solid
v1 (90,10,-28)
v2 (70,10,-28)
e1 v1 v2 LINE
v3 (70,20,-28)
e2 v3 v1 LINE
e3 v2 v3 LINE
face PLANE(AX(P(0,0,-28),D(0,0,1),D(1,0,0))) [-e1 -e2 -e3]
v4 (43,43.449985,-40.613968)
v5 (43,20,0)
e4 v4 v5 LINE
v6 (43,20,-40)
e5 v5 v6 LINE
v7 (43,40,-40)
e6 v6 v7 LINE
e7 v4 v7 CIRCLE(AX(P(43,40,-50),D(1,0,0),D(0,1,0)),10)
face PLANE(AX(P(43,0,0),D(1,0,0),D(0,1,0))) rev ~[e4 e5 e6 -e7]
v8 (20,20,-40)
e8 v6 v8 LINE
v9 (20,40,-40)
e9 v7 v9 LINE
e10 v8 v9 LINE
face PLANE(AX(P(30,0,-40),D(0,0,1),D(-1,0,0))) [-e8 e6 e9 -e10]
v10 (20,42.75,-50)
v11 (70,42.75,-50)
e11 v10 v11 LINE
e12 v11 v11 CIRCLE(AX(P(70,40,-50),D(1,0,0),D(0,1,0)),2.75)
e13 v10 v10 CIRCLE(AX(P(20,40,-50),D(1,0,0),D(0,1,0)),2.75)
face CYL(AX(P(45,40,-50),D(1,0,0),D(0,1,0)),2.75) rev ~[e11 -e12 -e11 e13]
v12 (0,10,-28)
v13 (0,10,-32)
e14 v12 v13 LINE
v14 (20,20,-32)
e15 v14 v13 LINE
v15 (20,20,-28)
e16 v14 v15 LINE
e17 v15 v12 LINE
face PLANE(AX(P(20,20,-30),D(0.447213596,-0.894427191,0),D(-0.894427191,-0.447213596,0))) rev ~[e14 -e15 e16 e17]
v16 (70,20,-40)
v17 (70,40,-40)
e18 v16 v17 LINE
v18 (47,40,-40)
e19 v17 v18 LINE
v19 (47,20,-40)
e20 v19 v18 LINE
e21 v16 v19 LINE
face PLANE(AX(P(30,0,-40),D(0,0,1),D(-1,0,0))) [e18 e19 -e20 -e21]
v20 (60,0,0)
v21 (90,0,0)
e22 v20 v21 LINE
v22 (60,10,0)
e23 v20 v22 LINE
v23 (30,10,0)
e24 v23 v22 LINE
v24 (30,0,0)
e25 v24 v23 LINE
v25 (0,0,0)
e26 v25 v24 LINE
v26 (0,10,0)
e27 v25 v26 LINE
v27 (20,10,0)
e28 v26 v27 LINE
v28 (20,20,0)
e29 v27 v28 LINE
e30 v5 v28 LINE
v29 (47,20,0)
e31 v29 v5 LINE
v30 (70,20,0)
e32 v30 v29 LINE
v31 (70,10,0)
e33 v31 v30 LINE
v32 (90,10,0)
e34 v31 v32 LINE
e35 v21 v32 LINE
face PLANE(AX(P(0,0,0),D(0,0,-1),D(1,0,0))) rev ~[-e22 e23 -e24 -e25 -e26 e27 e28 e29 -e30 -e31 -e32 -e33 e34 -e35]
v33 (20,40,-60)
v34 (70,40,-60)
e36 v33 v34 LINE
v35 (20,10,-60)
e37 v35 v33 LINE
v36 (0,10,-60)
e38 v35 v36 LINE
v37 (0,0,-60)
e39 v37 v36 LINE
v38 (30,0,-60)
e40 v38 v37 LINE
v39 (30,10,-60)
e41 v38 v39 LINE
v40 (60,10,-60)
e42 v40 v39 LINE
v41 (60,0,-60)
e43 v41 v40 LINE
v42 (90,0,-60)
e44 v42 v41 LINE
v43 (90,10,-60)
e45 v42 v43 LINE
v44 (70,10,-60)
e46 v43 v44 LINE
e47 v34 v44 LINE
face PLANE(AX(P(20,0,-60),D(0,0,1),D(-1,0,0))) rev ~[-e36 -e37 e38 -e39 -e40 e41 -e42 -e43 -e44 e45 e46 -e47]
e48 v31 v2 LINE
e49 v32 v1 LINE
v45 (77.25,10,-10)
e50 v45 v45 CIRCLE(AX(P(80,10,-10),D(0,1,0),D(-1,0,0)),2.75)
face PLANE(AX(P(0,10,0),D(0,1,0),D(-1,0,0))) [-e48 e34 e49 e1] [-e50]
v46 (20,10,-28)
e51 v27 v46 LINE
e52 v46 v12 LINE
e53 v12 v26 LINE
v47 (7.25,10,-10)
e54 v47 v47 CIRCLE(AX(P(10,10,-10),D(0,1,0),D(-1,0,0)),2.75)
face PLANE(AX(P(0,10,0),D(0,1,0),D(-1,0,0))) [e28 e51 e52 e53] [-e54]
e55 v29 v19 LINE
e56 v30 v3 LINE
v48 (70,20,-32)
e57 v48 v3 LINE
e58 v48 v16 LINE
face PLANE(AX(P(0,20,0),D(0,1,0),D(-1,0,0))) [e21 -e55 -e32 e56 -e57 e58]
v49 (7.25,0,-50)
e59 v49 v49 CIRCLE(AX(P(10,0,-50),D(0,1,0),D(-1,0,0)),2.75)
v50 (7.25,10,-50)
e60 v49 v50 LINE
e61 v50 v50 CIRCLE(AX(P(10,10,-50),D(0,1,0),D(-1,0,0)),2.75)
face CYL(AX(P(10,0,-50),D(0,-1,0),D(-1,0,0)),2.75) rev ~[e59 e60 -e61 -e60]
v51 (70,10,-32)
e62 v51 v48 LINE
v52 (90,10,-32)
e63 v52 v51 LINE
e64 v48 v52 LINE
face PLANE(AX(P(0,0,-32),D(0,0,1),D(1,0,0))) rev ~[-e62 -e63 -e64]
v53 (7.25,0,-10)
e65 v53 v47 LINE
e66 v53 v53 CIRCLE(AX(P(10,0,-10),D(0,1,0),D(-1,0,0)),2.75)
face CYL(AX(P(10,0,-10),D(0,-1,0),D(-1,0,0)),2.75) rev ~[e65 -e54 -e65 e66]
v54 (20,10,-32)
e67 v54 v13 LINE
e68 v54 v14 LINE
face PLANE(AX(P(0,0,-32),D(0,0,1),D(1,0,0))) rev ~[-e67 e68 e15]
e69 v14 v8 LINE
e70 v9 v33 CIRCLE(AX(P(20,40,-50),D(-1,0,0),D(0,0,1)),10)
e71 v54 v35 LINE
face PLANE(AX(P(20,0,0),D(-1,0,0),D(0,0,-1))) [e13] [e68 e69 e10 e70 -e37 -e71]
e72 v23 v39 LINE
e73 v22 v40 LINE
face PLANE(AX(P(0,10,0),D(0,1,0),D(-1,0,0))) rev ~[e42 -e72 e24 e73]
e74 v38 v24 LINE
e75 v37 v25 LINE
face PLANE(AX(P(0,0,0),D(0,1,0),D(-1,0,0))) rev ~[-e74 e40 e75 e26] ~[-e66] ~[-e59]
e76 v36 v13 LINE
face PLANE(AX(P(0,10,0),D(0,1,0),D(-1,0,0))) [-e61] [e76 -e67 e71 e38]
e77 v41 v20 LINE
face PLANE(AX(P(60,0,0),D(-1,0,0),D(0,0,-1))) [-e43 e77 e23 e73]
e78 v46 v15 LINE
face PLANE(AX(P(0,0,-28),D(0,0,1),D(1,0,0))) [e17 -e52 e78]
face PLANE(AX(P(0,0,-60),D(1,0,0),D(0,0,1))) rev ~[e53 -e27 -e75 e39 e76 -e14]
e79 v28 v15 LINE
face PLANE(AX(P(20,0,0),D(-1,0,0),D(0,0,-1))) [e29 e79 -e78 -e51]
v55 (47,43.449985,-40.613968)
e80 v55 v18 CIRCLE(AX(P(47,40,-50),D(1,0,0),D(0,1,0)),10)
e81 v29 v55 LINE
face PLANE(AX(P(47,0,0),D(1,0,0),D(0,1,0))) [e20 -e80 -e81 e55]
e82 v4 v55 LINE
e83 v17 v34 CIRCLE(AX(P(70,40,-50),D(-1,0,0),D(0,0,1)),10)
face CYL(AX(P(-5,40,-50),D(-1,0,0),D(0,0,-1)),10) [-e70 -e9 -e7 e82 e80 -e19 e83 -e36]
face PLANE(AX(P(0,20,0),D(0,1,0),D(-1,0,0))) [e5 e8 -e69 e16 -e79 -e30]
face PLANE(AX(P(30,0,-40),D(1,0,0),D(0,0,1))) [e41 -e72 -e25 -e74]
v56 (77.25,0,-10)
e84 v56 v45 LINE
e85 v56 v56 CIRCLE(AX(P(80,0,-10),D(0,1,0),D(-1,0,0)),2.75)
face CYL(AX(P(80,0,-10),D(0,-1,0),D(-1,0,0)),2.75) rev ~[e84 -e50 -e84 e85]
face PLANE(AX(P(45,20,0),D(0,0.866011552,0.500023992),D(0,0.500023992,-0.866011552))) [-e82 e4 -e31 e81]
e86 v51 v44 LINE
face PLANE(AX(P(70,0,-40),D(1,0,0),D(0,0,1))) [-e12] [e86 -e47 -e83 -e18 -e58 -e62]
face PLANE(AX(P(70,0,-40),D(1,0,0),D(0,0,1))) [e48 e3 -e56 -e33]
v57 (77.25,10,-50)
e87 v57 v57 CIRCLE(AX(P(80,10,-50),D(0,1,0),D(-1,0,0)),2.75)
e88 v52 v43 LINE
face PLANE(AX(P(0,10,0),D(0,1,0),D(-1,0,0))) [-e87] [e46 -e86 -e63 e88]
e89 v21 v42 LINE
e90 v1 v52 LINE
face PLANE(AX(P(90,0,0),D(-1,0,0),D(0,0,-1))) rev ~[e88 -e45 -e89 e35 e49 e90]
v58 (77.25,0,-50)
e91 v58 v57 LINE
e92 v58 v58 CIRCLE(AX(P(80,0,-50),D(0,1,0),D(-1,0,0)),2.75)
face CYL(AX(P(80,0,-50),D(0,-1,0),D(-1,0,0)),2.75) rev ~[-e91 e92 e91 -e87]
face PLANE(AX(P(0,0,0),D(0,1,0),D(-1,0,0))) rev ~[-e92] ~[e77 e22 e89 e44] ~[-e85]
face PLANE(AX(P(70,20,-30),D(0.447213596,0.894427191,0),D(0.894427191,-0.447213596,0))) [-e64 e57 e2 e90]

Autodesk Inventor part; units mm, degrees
ref_plane "XZ Plane" through (0, 0, 0) normal (0, 1, 0) x (-1, 0, 0)
sketch "Sketch1" plane through (0, 0, 0) normal (0, 1, 0) x (-1, 0, 0)
  line L0 (0, 0) -> (-90, 0)
  line L1 (-90, 0) -> (-90, -60)
  line L2 (-90, -60) -> (0, -60)
  line L3 (0, -60) -> (0, 0)
  line L4 (-30, 0) -> (-60, 0)
  line L5 (-60, 0) -> (-60, -60)
  line L6 (-60, -60) -> (-30, -60)
  line L7 (-30, -60) -> (-30, 0)
  line L8 (-20, -60) -> (-70, -60)
  line L9 (-70, -60) -> (-70, 0)
  line L10 (-70, 0) -> (-20, 0)
  line L11 (-20, 0) -> (-20, -60)
  line L12 (-20, -60) -> (-70, -60)
  line L13 (-70, -60) -> (-70, -40)
  line L14 (-70, -40) -> (-20, -40)
  line L15 (-20, -40) -> (-20, -60)
  circle A0 centre (-10, -50) radius 2.75
  circle A1 centre (-10, -10) radius 2.75
  circle A2 centre (-80, -50) radius 2.75
  circle A3 centre (-80, -10) radius 2.75
  point P0 (0, -30)
  point P1 (-60, -40)
  point P2 (-30, -40)
  point P3 (-70, 0)
  point P4 (-20, 0)
  dimension "d0" = 90
  dimension "d1" = 60
  dimension "d2" = 30
  dimension "d3" = 30
  dimension "d4" = 50
  dimension "d5" = 60
  dimension "d6" = 20
  dimension "d7" = 20
  dimension "d8" = 5.5
  dimension "d9" = 5.5
  dimension "d10" = 5.5
  dimension "d11" = 5.5
  dimension "d12" = 10
  dimension "d13" = 10
  dimension "d14" = 10
  dimension "d15" = 10
  dimension "d16" = 10
  dimension "d17" = 10
  dimension "d18" = 10
  dimension "d19" = 10
extrude "Extrusion1" add sketch "Sketch1" along normal blind 10 contours L3 L2 L11 L0 | L9 L2 L1 L0
extrude "Extrusion2" add sketch "Sketch1" along normal blind 20 contours L11 L14 L7 L0 | L7 L14 L5 L0 | L11 L2 L7 L14 | L5 L14 L9 L0 | L5 L2 L9 L14
extrude "Extrusion3" add sketch "Sketch1" along normal blind 50 contours L11 L2 L7 L14 | L7 L2 L5 L14 | L5 L2 L9 L14
extrude "Extrusion4" cut sketch "Sketch1" along normal blind 10 contours L7 L14 L5 L0 | L7 L2 L5 L14
ref_plane "Work Plane2" through (0, 0, -30) normal (0, 0, 1) x (1, 0, 0)
ref_plane "Work Plane3" through (45, 0, 0) normal (1, 0, 0) x (0, 1, 0)
sketch "Sketch7" plane through (0, 0, -30) normal (0, 0, 1) x (1, 0, 0)
  line L0 (20, 10) -> (20, 20) projected
  line L1 (20, 10) -> (0, 10) projected
  line L2 (20, 20) -> (0, 10)
  line L3 (0, 10) -> (20, 10)
  line L4 (20, 10) -> (20, 20)
  line L5 (70, 20) -> (60, 20) projected
  line L6 (70, 20) -> (90, 10)
  line L7 (90, 10) -> (70, 10) projected
  line L8 (90, 10) -> (70, 10)
  line L9 (70, 10) -> (70, 20)
  point P0 (0, 0)
extrude "Extrusion9" add sketch "Sketch7" along normal mid plane 4
sketch "Sketch8" plane through (45, 0, 0) normal (1, 0, 0) x (0, 1, 0)
  circle A0 centre (40, -50) radius 2.75
  line L0 (20, 0) -> (50, -51.9582)
  line L1 (20, 0) -> (20, -51.9582)
  line L2 (20, -51.9582) -> (50, -51.9582)
  point P0 (0, 0)
  point P1 (38.0692, -51.9582)
  point P2 (41.9308, -51.9582)
  dimension "d45" = 40
  dimension "d49" = 50
  dimension "d50" = 20
  dimension "d55" = 5.5
extrude "Extrusion10" add sketch "Sketch8" along normal mid plane 4 contours A0 L2 L1 L0
extrude "Extrusion11" cut sketch "Sketch8" along normal through all both and the other way through all contours A0 L2 | L2 A0
fillet "Fillet1" radius 10 2 edges at (45, 50, -40) (45, 50, -60)
properties part number "Homework 1d" material "Aluminum 6061"
